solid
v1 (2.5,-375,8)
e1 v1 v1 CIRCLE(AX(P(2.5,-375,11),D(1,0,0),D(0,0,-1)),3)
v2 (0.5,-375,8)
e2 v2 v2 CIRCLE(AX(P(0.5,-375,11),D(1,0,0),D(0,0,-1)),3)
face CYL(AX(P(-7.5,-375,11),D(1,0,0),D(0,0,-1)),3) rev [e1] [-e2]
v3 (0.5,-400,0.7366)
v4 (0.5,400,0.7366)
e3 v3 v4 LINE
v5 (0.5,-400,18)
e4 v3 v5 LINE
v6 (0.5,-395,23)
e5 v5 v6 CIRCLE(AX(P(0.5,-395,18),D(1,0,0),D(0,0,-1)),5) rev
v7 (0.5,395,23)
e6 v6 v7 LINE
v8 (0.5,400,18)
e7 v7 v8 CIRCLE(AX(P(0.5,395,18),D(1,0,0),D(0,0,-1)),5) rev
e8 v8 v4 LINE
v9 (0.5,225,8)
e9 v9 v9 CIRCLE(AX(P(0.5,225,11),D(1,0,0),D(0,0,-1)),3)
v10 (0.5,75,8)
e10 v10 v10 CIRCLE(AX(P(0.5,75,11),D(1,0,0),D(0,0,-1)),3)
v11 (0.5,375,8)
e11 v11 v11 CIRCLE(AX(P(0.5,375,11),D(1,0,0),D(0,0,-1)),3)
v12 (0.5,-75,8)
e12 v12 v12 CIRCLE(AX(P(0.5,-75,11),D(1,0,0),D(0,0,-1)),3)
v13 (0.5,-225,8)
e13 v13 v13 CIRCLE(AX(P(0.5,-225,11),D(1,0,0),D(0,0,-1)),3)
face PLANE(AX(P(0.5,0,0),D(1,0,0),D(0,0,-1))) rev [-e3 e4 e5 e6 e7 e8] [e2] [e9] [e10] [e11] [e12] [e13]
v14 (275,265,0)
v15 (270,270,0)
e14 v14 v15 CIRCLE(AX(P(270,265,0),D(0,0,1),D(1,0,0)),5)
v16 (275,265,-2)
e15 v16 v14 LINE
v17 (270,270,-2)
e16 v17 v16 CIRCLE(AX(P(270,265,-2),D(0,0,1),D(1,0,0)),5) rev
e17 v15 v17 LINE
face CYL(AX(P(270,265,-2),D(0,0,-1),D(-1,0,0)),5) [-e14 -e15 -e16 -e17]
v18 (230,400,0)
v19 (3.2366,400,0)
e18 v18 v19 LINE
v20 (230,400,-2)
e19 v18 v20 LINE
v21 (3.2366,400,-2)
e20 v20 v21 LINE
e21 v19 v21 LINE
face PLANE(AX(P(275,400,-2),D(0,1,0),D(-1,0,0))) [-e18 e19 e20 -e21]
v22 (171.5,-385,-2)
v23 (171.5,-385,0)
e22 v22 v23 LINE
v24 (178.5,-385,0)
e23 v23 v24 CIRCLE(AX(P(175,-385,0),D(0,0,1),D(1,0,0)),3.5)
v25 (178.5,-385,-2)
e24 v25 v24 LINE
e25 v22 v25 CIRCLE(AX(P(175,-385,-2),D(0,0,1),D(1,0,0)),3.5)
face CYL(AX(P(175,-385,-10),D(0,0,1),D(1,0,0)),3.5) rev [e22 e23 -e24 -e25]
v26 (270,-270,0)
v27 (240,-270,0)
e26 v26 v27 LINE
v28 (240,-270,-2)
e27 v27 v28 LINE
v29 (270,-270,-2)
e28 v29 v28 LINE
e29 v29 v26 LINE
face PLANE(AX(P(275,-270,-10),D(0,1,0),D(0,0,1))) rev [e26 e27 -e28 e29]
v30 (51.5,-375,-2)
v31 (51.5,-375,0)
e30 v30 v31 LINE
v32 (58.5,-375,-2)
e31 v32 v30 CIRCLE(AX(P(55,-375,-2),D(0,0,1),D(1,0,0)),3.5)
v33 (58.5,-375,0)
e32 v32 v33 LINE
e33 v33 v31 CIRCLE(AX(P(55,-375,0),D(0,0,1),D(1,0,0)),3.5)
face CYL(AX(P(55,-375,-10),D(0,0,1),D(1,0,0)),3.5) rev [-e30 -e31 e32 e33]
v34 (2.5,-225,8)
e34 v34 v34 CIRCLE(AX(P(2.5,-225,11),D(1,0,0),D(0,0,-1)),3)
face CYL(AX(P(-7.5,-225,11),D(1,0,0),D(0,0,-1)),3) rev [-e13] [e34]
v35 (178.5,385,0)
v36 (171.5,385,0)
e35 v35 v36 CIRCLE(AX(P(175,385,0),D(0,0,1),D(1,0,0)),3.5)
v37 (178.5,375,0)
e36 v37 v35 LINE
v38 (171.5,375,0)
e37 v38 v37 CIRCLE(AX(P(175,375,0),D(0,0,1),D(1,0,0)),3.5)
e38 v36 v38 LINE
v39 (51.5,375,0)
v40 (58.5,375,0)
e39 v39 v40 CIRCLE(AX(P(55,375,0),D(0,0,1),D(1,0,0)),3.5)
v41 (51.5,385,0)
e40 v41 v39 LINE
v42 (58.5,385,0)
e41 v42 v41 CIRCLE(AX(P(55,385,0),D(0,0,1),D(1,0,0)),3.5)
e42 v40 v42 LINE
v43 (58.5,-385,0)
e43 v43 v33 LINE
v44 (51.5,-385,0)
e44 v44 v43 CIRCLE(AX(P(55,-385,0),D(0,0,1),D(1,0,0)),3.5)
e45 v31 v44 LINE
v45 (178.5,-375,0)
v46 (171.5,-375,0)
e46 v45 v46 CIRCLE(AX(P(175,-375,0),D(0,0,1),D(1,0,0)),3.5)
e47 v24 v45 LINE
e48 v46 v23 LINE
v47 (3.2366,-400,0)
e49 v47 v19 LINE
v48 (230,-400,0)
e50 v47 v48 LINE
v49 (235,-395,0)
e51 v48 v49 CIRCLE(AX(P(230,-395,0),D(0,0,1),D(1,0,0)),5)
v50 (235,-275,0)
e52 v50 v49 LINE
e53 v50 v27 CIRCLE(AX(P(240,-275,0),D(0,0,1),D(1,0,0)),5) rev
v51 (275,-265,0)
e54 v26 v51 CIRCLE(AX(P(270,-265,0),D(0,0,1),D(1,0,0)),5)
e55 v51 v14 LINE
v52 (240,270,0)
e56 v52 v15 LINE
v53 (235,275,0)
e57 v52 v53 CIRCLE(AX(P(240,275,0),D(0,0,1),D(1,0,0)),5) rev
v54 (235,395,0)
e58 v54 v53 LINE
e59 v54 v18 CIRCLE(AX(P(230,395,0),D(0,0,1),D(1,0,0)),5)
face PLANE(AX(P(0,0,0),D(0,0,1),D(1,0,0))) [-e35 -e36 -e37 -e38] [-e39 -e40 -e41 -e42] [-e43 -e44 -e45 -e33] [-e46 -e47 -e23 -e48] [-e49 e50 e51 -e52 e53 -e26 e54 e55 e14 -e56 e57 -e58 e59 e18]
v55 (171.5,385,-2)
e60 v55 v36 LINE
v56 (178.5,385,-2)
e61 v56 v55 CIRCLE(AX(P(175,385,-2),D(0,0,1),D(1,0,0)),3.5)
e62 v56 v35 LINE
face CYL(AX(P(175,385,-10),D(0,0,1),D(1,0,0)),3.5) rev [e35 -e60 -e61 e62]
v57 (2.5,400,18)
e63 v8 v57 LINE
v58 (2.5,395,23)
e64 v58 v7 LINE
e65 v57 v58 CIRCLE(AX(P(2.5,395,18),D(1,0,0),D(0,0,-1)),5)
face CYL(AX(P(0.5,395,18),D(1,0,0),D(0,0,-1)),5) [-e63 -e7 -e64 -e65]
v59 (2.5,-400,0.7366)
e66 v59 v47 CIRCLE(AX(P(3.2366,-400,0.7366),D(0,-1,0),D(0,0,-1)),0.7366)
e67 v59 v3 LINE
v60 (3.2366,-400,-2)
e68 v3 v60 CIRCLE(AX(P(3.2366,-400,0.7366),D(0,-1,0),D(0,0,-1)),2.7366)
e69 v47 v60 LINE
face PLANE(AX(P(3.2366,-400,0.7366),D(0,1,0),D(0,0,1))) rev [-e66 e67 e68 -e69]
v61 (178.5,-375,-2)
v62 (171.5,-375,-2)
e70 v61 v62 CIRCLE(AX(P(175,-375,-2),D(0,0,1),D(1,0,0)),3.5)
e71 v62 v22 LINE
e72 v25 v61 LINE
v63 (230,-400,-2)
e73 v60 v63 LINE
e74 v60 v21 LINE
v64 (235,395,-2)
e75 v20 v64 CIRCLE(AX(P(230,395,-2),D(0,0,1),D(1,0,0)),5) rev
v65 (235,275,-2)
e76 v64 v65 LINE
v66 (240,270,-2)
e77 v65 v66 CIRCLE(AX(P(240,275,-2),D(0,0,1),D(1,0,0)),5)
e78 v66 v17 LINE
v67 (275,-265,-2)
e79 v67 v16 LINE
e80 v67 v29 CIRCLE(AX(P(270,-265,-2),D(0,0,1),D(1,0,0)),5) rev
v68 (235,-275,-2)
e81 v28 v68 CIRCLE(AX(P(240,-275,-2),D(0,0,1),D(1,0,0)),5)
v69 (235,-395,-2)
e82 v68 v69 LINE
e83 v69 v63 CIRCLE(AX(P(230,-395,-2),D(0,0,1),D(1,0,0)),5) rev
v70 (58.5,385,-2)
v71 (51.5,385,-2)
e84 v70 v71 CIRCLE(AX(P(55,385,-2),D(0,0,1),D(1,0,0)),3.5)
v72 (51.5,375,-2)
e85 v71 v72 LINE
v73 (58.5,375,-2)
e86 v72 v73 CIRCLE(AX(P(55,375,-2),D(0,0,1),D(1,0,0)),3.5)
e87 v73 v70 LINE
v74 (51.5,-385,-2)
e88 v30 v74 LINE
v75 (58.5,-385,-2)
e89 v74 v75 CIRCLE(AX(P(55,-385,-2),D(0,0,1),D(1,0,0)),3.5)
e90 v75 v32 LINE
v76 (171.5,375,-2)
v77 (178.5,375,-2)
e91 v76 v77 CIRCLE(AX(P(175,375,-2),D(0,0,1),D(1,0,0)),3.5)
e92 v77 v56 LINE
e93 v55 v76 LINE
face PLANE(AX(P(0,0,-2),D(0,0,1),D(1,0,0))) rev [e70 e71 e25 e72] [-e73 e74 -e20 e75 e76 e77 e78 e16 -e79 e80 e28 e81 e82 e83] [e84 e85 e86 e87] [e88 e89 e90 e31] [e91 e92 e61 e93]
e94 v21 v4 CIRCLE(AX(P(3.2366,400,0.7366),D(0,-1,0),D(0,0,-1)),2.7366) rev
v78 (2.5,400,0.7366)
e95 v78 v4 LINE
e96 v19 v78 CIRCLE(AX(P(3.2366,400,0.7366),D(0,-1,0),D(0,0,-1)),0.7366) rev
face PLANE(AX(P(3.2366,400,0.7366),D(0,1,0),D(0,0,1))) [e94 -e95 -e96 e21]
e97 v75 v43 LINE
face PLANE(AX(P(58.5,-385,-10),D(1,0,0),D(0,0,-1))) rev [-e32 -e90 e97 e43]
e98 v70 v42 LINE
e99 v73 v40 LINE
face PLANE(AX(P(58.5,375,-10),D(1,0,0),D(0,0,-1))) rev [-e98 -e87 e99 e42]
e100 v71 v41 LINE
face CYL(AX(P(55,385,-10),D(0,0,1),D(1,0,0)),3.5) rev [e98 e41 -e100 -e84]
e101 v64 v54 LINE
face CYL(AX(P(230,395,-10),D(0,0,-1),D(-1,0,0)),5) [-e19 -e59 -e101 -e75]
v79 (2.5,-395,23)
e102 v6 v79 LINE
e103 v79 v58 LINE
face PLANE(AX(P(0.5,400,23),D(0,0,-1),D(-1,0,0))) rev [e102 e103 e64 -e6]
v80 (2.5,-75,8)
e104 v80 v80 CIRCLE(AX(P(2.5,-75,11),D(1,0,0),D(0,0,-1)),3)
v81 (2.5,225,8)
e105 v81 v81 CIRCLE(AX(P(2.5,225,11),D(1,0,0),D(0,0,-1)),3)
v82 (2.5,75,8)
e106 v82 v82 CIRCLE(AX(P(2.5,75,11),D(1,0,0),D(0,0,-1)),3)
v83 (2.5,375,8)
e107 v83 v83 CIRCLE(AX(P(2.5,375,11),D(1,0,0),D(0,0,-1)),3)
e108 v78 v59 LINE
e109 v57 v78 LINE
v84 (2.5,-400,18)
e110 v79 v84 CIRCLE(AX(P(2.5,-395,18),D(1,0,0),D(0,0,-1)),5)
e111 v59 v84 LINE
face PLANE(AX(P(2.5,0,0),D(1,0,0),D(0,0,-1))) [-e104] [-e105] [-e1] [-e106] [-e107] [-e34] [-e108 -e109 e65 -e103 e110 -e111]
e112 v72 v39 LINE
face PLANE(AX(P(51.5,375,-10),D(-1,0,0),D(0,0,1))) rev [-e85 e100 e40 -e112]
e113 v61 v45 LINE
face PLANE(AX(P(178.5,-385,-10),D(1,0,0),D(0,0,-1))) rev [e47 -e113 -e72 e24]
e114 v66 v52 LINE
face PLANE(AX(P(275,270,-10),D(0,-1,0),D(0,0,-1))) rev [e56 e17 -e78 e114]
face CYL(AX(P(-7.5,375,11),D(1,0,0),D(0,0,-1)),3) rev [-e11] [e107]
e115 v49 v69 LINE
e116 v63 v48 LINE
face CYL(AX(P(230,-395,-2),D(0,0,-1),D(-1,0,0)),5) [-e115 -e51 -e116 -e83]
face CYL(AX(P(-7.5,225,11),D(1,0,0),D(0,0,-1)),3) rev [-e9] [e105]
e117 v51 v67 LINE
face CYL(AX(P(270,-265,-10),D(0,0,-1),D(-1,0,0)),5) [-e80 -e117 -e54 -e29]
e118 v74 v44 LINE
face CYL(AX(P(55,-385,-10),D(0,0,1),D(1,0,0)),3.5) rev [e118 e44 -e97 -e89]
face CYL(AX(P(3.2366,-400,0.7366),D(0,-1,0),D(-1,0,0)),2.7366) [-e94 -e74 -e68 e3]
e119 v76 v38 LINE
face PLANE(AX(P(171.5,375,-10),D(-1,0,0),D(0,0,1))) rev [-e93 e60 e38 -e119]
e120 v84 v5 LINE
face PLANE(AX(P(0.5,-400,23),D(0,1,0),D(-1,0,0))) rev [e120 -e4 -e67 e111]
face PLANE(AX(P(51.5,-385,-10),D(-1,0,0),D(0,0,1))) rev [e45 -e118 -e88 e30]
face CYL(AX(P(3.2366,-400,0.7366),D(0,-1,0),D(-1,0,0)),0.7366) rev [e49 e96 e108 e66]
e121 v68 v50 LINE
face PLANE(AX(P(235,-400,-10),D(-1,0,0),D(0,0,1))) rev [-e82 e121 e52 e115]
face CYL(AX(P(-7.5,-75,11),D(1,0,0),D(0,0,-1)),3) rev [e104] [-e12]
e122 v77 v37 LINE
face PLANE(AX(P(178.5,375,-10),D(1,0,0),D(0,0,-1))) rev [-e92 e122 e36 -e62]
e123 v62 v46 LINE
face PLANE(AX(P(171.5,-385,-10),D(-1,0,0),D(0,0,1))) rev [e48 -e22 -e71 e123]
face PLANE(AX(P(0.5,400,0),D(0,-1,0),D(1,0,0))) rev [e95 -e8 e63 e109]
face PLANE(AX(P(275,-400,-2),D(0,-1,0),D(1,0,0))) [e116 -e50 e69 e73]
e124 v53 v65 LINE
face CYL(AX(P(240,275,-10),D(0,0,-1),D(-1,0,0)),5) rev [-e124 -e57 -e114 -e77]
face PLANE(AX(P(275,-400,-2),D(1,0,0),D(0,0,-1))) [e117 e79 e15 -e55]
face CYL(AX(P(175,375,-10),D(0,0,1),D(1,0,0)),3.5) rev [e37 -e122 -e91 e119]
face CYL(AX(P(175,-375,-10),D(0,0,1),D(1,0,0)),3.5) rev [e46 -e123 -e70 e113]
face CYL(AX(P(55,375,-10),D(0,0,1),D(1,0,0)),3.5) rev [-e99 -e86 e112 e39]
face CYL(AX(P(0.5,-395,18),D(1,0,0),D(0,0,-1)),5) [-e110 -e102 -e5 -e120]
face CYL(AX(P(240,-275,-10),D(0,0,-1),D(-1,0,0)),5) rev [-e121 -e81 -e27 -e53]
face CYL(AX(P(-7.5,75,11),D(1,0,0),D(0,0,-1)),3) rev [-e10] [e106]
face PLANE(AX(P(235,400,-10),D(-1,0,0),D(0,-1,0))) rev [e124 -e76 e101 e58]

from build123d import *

# Parameters (mm, degrees)
SKETCH_1_W                       = 550
SKETCH_1_H                       = 800
SM_BASE_FLANGE_1_DEPTH           = 2
SKETCH_6_W                       = 40
SKETCH_6_H                       = 130
CUT_EXTRUDE_1_DEPTH              = 10
FILLET_1_R                       = 5
SKETCH_7_W                       = 1
SKETCH_7_H                       = 845.505579408
CUT_EXTRUDE_2_DEPTH              = 10
SKETCH_8_W                       = 316.431651149
SKETCH_8_H                       = 807.863383274
CUT_EXTRUDE_3_DEPTH              = 10
SM_EDGE_FLANGE_1_STRIP_W         = 9.4732
SM_EDGE_FLANGE_1_STRIP_H         = 2
SM_EDGE_FLANGE_1_STRIP_CUT_DEPTH = 800
SM_EDGE_FLANGE_1_DEPTH           = 800
FILLET_2_R                       = 5
CUT_EXTRUDE_4_DEPTH              = 10
SKETCH_13_R                      = 3
CUT_EXTRUDE_5_DEPTH              = 10
PATTERN_LINEAR_1_COUNT           = 6
PATTERN_LINEAR_1_PITCH           = 150


# Sheet-metal steps are written as plain solids
with BuildPart() as part:
    # Sketch 1 → 基体-法兰1 (new body)
    with BuildSketch(Plane.XY):
        Rectangle(SKETCH_1_W, SKETCH_1_H)
    extrude(amount=-SM_BASE_FLANGE_1_DEPTH)

    # 草图6 → 切除-拉伸1 (cut)
    with BuildSketch(Plane.XY):
        with Locations((255, 335)):
            Rectangle(SKETCH_6_W, SKETCH_6_H)
        with Locations((255, -335)):
            Rectangle(SKETCH_6_W, SKETCH_6_H)
    extrude(amount=-CUT_EXTRUDE_1_DEPTH, mode=Mode.SUBTRACT)

    # 圆角1
    fillet_1_edges = [part.edges().sort_by_distance(p)[0] for p in [
        (275, 270, -1),
        (235, 270, -1),
        (235, 400, -1),
        (275, -270, -1),
        (235, -400, -1),
        (235, -270, -1),
        (-275, 400, -1),
        (-275, -400, -1),
    ]]
    fillet(fillet_1_edges, radius=FILLET_1_R)

    # 草图7 → 切除-拉伸2 (cut)
    with BuildSketch(Plane.XY):
        Rectangle(SKETCH_7_W, SKETCH_7_H)
    extrude(amount=-CUT_EXTRUDE_2_DEPTH, mode=Mode.SUBTRACT)


with BuildPart() as cut_extrude_2_piece_1:
    # of the separate pieces the step leaves, piece 1, a body of its own (cut_extrude_2_pieces)
    add(part.part.solids().sort_by_distance((-0.5, -400, 0))[0])

    # 草图8 → 切除-拉伸3 (cut)
    with BuildSketch(Plane.XY):
        with Locations((-158.715825575, -3.931691637)):
            Rectangle(SKETCH_8_W, SKETCH_8_H)
    extrude(amount=-CUT_EXTRUDE_3_DEPTH, mode=Mode.SUBTRACT)


with BuildPart() as cut_extrude_2_piece_2:
    # of the separate pieces the step leaves, piece 2, a body of its own (cut_extrude_2_pieces)
    add(part.part.solids().sort_by_distance((230, -400, 0))[0])

    # 边线-法兰1 strip (across the edge) → 边线-法兰1 strip cut (cut)
    with BuildSketch(Plane(origin=(0.5, 400, 0), x_dir=(1, 0, 0), z_dir=(0, -1, 0))):
        with Locations((-2, -1)):
            Rectangle(SM_EDGE_FLANGE_1_STRIP_W, SM_EDGE_FLANGE_1_STRIP_H)
    extrude(amount=SM_EDGE_FLANGE_1_STRIP_CUT_DEPTH, mode=Mode.SUBTRACT)

    # 边线-法兰1 section (across the edge) → 边线-法兰1 (add)
    with BuildSketch(Plane(origin=(0.5, 400, 0), x_dir=(1, 0, 0), z_dir=(0, -1, 0))):
        with BuildLine():
            Line((0, 0.7366), (0, 23))
            Line((0, 23), (2, 23))
            Line((2, 23), (2, 0.7366))
            ThreePointArc((2, 0.7366), (2.215745145, 0.215745145), (2.7366, 0))
            Line((2.7366, 0), (2.7366, -2))
            ThreePointArc((2.7366, -2), (0.801531583, -1.198468417), (0, 0.7366))
        make_face()
    extrude(amount=SM_EDGE_FLANGE_1_DEPTH)

    # 圆角2
    fillet_2_edges = [cut_extrude_2_piece_2.edges().sort_by_distance(p)[0] for p in [
        (1.5, 400, 23),
        (1.5, -400, 23),
    ]]
    fillet(fillet_2_edges, radius=FILLET_2_R)

    # 草图12 → 切除-拉伸4 (cut)
    with BuildSketch(Plane.XY):
        with BuildLine():
            Line((51.5, 375), (51.5, 385))
            ThreePointArc((51.5, 385), (55, 388.5), (58.5, 385))
            Line((58.5, 385), (58.5, 375))
            ThreePointArc((58.5, 375), (55, 371.5), (51.5, 375))
        make_face()
        with BuildLine():
            Line((171.5, 375), (171.5, 385))
            ThreePointArc((171.5, 385), (175, 388.5), (178.5, 385))
            Line((178.5, 385), (178.5, 375))
            ThreePointArc((178.5, 375), (175, 371.5), (171.5, 375))
        make_face()
        with BuildLine():
            Line((51.5, -385), (51.5, -375))
            ThreePointArc((51.5, -375), (55, -371.5), (58.5, -375))
            Line((58.5, -375), (58.5, -385))
            ThreePointArc((58.5, -385), (55, -388.5), (51.5, -385))
        make_face()
        with BuildLine():
            Line((171.5, -385), (171.5, -375))
            ThreePointArc((171.5, -375), (175, -371.5), (178.5, -375))
            Line((178.5, -375), (178.5, -385))
            ThreePointArc((178.5, -385), (175, -388.5), (171.5, -385))
        make_face()
    extrude(amount=-CUT_EXTRUDE_4_DEPTH, mode=Mode.SUBTRACT)

    # 草图13 → 切除-拉伸5 (cut)
    with BuildSketch(Plane(origin=(2.5, 0, 0), x_dir=(0, 0, -1), z_dir=(1, 0, 0))):
        with Locations((-11, -375)):
            Circle(SKETCH_13_R)
    cut_extrude_5 = extrude(amount=-CUT_EXTRUDE_5_DEPTH, mode=Mode.SUBTRACT)

    # 阵列(线性)1: 切除-拉伸5 ×6
    with Locations(*[(0, i * PATTERN_LINEAR_1_PITCH, 0) for i in range(1, PATTERN_LINEAR_1_COUNT)]):
        add(cut_extrude_5, mode=Mode.SUBTRACT)


solid = cut_extrude_2_piece_2.part
